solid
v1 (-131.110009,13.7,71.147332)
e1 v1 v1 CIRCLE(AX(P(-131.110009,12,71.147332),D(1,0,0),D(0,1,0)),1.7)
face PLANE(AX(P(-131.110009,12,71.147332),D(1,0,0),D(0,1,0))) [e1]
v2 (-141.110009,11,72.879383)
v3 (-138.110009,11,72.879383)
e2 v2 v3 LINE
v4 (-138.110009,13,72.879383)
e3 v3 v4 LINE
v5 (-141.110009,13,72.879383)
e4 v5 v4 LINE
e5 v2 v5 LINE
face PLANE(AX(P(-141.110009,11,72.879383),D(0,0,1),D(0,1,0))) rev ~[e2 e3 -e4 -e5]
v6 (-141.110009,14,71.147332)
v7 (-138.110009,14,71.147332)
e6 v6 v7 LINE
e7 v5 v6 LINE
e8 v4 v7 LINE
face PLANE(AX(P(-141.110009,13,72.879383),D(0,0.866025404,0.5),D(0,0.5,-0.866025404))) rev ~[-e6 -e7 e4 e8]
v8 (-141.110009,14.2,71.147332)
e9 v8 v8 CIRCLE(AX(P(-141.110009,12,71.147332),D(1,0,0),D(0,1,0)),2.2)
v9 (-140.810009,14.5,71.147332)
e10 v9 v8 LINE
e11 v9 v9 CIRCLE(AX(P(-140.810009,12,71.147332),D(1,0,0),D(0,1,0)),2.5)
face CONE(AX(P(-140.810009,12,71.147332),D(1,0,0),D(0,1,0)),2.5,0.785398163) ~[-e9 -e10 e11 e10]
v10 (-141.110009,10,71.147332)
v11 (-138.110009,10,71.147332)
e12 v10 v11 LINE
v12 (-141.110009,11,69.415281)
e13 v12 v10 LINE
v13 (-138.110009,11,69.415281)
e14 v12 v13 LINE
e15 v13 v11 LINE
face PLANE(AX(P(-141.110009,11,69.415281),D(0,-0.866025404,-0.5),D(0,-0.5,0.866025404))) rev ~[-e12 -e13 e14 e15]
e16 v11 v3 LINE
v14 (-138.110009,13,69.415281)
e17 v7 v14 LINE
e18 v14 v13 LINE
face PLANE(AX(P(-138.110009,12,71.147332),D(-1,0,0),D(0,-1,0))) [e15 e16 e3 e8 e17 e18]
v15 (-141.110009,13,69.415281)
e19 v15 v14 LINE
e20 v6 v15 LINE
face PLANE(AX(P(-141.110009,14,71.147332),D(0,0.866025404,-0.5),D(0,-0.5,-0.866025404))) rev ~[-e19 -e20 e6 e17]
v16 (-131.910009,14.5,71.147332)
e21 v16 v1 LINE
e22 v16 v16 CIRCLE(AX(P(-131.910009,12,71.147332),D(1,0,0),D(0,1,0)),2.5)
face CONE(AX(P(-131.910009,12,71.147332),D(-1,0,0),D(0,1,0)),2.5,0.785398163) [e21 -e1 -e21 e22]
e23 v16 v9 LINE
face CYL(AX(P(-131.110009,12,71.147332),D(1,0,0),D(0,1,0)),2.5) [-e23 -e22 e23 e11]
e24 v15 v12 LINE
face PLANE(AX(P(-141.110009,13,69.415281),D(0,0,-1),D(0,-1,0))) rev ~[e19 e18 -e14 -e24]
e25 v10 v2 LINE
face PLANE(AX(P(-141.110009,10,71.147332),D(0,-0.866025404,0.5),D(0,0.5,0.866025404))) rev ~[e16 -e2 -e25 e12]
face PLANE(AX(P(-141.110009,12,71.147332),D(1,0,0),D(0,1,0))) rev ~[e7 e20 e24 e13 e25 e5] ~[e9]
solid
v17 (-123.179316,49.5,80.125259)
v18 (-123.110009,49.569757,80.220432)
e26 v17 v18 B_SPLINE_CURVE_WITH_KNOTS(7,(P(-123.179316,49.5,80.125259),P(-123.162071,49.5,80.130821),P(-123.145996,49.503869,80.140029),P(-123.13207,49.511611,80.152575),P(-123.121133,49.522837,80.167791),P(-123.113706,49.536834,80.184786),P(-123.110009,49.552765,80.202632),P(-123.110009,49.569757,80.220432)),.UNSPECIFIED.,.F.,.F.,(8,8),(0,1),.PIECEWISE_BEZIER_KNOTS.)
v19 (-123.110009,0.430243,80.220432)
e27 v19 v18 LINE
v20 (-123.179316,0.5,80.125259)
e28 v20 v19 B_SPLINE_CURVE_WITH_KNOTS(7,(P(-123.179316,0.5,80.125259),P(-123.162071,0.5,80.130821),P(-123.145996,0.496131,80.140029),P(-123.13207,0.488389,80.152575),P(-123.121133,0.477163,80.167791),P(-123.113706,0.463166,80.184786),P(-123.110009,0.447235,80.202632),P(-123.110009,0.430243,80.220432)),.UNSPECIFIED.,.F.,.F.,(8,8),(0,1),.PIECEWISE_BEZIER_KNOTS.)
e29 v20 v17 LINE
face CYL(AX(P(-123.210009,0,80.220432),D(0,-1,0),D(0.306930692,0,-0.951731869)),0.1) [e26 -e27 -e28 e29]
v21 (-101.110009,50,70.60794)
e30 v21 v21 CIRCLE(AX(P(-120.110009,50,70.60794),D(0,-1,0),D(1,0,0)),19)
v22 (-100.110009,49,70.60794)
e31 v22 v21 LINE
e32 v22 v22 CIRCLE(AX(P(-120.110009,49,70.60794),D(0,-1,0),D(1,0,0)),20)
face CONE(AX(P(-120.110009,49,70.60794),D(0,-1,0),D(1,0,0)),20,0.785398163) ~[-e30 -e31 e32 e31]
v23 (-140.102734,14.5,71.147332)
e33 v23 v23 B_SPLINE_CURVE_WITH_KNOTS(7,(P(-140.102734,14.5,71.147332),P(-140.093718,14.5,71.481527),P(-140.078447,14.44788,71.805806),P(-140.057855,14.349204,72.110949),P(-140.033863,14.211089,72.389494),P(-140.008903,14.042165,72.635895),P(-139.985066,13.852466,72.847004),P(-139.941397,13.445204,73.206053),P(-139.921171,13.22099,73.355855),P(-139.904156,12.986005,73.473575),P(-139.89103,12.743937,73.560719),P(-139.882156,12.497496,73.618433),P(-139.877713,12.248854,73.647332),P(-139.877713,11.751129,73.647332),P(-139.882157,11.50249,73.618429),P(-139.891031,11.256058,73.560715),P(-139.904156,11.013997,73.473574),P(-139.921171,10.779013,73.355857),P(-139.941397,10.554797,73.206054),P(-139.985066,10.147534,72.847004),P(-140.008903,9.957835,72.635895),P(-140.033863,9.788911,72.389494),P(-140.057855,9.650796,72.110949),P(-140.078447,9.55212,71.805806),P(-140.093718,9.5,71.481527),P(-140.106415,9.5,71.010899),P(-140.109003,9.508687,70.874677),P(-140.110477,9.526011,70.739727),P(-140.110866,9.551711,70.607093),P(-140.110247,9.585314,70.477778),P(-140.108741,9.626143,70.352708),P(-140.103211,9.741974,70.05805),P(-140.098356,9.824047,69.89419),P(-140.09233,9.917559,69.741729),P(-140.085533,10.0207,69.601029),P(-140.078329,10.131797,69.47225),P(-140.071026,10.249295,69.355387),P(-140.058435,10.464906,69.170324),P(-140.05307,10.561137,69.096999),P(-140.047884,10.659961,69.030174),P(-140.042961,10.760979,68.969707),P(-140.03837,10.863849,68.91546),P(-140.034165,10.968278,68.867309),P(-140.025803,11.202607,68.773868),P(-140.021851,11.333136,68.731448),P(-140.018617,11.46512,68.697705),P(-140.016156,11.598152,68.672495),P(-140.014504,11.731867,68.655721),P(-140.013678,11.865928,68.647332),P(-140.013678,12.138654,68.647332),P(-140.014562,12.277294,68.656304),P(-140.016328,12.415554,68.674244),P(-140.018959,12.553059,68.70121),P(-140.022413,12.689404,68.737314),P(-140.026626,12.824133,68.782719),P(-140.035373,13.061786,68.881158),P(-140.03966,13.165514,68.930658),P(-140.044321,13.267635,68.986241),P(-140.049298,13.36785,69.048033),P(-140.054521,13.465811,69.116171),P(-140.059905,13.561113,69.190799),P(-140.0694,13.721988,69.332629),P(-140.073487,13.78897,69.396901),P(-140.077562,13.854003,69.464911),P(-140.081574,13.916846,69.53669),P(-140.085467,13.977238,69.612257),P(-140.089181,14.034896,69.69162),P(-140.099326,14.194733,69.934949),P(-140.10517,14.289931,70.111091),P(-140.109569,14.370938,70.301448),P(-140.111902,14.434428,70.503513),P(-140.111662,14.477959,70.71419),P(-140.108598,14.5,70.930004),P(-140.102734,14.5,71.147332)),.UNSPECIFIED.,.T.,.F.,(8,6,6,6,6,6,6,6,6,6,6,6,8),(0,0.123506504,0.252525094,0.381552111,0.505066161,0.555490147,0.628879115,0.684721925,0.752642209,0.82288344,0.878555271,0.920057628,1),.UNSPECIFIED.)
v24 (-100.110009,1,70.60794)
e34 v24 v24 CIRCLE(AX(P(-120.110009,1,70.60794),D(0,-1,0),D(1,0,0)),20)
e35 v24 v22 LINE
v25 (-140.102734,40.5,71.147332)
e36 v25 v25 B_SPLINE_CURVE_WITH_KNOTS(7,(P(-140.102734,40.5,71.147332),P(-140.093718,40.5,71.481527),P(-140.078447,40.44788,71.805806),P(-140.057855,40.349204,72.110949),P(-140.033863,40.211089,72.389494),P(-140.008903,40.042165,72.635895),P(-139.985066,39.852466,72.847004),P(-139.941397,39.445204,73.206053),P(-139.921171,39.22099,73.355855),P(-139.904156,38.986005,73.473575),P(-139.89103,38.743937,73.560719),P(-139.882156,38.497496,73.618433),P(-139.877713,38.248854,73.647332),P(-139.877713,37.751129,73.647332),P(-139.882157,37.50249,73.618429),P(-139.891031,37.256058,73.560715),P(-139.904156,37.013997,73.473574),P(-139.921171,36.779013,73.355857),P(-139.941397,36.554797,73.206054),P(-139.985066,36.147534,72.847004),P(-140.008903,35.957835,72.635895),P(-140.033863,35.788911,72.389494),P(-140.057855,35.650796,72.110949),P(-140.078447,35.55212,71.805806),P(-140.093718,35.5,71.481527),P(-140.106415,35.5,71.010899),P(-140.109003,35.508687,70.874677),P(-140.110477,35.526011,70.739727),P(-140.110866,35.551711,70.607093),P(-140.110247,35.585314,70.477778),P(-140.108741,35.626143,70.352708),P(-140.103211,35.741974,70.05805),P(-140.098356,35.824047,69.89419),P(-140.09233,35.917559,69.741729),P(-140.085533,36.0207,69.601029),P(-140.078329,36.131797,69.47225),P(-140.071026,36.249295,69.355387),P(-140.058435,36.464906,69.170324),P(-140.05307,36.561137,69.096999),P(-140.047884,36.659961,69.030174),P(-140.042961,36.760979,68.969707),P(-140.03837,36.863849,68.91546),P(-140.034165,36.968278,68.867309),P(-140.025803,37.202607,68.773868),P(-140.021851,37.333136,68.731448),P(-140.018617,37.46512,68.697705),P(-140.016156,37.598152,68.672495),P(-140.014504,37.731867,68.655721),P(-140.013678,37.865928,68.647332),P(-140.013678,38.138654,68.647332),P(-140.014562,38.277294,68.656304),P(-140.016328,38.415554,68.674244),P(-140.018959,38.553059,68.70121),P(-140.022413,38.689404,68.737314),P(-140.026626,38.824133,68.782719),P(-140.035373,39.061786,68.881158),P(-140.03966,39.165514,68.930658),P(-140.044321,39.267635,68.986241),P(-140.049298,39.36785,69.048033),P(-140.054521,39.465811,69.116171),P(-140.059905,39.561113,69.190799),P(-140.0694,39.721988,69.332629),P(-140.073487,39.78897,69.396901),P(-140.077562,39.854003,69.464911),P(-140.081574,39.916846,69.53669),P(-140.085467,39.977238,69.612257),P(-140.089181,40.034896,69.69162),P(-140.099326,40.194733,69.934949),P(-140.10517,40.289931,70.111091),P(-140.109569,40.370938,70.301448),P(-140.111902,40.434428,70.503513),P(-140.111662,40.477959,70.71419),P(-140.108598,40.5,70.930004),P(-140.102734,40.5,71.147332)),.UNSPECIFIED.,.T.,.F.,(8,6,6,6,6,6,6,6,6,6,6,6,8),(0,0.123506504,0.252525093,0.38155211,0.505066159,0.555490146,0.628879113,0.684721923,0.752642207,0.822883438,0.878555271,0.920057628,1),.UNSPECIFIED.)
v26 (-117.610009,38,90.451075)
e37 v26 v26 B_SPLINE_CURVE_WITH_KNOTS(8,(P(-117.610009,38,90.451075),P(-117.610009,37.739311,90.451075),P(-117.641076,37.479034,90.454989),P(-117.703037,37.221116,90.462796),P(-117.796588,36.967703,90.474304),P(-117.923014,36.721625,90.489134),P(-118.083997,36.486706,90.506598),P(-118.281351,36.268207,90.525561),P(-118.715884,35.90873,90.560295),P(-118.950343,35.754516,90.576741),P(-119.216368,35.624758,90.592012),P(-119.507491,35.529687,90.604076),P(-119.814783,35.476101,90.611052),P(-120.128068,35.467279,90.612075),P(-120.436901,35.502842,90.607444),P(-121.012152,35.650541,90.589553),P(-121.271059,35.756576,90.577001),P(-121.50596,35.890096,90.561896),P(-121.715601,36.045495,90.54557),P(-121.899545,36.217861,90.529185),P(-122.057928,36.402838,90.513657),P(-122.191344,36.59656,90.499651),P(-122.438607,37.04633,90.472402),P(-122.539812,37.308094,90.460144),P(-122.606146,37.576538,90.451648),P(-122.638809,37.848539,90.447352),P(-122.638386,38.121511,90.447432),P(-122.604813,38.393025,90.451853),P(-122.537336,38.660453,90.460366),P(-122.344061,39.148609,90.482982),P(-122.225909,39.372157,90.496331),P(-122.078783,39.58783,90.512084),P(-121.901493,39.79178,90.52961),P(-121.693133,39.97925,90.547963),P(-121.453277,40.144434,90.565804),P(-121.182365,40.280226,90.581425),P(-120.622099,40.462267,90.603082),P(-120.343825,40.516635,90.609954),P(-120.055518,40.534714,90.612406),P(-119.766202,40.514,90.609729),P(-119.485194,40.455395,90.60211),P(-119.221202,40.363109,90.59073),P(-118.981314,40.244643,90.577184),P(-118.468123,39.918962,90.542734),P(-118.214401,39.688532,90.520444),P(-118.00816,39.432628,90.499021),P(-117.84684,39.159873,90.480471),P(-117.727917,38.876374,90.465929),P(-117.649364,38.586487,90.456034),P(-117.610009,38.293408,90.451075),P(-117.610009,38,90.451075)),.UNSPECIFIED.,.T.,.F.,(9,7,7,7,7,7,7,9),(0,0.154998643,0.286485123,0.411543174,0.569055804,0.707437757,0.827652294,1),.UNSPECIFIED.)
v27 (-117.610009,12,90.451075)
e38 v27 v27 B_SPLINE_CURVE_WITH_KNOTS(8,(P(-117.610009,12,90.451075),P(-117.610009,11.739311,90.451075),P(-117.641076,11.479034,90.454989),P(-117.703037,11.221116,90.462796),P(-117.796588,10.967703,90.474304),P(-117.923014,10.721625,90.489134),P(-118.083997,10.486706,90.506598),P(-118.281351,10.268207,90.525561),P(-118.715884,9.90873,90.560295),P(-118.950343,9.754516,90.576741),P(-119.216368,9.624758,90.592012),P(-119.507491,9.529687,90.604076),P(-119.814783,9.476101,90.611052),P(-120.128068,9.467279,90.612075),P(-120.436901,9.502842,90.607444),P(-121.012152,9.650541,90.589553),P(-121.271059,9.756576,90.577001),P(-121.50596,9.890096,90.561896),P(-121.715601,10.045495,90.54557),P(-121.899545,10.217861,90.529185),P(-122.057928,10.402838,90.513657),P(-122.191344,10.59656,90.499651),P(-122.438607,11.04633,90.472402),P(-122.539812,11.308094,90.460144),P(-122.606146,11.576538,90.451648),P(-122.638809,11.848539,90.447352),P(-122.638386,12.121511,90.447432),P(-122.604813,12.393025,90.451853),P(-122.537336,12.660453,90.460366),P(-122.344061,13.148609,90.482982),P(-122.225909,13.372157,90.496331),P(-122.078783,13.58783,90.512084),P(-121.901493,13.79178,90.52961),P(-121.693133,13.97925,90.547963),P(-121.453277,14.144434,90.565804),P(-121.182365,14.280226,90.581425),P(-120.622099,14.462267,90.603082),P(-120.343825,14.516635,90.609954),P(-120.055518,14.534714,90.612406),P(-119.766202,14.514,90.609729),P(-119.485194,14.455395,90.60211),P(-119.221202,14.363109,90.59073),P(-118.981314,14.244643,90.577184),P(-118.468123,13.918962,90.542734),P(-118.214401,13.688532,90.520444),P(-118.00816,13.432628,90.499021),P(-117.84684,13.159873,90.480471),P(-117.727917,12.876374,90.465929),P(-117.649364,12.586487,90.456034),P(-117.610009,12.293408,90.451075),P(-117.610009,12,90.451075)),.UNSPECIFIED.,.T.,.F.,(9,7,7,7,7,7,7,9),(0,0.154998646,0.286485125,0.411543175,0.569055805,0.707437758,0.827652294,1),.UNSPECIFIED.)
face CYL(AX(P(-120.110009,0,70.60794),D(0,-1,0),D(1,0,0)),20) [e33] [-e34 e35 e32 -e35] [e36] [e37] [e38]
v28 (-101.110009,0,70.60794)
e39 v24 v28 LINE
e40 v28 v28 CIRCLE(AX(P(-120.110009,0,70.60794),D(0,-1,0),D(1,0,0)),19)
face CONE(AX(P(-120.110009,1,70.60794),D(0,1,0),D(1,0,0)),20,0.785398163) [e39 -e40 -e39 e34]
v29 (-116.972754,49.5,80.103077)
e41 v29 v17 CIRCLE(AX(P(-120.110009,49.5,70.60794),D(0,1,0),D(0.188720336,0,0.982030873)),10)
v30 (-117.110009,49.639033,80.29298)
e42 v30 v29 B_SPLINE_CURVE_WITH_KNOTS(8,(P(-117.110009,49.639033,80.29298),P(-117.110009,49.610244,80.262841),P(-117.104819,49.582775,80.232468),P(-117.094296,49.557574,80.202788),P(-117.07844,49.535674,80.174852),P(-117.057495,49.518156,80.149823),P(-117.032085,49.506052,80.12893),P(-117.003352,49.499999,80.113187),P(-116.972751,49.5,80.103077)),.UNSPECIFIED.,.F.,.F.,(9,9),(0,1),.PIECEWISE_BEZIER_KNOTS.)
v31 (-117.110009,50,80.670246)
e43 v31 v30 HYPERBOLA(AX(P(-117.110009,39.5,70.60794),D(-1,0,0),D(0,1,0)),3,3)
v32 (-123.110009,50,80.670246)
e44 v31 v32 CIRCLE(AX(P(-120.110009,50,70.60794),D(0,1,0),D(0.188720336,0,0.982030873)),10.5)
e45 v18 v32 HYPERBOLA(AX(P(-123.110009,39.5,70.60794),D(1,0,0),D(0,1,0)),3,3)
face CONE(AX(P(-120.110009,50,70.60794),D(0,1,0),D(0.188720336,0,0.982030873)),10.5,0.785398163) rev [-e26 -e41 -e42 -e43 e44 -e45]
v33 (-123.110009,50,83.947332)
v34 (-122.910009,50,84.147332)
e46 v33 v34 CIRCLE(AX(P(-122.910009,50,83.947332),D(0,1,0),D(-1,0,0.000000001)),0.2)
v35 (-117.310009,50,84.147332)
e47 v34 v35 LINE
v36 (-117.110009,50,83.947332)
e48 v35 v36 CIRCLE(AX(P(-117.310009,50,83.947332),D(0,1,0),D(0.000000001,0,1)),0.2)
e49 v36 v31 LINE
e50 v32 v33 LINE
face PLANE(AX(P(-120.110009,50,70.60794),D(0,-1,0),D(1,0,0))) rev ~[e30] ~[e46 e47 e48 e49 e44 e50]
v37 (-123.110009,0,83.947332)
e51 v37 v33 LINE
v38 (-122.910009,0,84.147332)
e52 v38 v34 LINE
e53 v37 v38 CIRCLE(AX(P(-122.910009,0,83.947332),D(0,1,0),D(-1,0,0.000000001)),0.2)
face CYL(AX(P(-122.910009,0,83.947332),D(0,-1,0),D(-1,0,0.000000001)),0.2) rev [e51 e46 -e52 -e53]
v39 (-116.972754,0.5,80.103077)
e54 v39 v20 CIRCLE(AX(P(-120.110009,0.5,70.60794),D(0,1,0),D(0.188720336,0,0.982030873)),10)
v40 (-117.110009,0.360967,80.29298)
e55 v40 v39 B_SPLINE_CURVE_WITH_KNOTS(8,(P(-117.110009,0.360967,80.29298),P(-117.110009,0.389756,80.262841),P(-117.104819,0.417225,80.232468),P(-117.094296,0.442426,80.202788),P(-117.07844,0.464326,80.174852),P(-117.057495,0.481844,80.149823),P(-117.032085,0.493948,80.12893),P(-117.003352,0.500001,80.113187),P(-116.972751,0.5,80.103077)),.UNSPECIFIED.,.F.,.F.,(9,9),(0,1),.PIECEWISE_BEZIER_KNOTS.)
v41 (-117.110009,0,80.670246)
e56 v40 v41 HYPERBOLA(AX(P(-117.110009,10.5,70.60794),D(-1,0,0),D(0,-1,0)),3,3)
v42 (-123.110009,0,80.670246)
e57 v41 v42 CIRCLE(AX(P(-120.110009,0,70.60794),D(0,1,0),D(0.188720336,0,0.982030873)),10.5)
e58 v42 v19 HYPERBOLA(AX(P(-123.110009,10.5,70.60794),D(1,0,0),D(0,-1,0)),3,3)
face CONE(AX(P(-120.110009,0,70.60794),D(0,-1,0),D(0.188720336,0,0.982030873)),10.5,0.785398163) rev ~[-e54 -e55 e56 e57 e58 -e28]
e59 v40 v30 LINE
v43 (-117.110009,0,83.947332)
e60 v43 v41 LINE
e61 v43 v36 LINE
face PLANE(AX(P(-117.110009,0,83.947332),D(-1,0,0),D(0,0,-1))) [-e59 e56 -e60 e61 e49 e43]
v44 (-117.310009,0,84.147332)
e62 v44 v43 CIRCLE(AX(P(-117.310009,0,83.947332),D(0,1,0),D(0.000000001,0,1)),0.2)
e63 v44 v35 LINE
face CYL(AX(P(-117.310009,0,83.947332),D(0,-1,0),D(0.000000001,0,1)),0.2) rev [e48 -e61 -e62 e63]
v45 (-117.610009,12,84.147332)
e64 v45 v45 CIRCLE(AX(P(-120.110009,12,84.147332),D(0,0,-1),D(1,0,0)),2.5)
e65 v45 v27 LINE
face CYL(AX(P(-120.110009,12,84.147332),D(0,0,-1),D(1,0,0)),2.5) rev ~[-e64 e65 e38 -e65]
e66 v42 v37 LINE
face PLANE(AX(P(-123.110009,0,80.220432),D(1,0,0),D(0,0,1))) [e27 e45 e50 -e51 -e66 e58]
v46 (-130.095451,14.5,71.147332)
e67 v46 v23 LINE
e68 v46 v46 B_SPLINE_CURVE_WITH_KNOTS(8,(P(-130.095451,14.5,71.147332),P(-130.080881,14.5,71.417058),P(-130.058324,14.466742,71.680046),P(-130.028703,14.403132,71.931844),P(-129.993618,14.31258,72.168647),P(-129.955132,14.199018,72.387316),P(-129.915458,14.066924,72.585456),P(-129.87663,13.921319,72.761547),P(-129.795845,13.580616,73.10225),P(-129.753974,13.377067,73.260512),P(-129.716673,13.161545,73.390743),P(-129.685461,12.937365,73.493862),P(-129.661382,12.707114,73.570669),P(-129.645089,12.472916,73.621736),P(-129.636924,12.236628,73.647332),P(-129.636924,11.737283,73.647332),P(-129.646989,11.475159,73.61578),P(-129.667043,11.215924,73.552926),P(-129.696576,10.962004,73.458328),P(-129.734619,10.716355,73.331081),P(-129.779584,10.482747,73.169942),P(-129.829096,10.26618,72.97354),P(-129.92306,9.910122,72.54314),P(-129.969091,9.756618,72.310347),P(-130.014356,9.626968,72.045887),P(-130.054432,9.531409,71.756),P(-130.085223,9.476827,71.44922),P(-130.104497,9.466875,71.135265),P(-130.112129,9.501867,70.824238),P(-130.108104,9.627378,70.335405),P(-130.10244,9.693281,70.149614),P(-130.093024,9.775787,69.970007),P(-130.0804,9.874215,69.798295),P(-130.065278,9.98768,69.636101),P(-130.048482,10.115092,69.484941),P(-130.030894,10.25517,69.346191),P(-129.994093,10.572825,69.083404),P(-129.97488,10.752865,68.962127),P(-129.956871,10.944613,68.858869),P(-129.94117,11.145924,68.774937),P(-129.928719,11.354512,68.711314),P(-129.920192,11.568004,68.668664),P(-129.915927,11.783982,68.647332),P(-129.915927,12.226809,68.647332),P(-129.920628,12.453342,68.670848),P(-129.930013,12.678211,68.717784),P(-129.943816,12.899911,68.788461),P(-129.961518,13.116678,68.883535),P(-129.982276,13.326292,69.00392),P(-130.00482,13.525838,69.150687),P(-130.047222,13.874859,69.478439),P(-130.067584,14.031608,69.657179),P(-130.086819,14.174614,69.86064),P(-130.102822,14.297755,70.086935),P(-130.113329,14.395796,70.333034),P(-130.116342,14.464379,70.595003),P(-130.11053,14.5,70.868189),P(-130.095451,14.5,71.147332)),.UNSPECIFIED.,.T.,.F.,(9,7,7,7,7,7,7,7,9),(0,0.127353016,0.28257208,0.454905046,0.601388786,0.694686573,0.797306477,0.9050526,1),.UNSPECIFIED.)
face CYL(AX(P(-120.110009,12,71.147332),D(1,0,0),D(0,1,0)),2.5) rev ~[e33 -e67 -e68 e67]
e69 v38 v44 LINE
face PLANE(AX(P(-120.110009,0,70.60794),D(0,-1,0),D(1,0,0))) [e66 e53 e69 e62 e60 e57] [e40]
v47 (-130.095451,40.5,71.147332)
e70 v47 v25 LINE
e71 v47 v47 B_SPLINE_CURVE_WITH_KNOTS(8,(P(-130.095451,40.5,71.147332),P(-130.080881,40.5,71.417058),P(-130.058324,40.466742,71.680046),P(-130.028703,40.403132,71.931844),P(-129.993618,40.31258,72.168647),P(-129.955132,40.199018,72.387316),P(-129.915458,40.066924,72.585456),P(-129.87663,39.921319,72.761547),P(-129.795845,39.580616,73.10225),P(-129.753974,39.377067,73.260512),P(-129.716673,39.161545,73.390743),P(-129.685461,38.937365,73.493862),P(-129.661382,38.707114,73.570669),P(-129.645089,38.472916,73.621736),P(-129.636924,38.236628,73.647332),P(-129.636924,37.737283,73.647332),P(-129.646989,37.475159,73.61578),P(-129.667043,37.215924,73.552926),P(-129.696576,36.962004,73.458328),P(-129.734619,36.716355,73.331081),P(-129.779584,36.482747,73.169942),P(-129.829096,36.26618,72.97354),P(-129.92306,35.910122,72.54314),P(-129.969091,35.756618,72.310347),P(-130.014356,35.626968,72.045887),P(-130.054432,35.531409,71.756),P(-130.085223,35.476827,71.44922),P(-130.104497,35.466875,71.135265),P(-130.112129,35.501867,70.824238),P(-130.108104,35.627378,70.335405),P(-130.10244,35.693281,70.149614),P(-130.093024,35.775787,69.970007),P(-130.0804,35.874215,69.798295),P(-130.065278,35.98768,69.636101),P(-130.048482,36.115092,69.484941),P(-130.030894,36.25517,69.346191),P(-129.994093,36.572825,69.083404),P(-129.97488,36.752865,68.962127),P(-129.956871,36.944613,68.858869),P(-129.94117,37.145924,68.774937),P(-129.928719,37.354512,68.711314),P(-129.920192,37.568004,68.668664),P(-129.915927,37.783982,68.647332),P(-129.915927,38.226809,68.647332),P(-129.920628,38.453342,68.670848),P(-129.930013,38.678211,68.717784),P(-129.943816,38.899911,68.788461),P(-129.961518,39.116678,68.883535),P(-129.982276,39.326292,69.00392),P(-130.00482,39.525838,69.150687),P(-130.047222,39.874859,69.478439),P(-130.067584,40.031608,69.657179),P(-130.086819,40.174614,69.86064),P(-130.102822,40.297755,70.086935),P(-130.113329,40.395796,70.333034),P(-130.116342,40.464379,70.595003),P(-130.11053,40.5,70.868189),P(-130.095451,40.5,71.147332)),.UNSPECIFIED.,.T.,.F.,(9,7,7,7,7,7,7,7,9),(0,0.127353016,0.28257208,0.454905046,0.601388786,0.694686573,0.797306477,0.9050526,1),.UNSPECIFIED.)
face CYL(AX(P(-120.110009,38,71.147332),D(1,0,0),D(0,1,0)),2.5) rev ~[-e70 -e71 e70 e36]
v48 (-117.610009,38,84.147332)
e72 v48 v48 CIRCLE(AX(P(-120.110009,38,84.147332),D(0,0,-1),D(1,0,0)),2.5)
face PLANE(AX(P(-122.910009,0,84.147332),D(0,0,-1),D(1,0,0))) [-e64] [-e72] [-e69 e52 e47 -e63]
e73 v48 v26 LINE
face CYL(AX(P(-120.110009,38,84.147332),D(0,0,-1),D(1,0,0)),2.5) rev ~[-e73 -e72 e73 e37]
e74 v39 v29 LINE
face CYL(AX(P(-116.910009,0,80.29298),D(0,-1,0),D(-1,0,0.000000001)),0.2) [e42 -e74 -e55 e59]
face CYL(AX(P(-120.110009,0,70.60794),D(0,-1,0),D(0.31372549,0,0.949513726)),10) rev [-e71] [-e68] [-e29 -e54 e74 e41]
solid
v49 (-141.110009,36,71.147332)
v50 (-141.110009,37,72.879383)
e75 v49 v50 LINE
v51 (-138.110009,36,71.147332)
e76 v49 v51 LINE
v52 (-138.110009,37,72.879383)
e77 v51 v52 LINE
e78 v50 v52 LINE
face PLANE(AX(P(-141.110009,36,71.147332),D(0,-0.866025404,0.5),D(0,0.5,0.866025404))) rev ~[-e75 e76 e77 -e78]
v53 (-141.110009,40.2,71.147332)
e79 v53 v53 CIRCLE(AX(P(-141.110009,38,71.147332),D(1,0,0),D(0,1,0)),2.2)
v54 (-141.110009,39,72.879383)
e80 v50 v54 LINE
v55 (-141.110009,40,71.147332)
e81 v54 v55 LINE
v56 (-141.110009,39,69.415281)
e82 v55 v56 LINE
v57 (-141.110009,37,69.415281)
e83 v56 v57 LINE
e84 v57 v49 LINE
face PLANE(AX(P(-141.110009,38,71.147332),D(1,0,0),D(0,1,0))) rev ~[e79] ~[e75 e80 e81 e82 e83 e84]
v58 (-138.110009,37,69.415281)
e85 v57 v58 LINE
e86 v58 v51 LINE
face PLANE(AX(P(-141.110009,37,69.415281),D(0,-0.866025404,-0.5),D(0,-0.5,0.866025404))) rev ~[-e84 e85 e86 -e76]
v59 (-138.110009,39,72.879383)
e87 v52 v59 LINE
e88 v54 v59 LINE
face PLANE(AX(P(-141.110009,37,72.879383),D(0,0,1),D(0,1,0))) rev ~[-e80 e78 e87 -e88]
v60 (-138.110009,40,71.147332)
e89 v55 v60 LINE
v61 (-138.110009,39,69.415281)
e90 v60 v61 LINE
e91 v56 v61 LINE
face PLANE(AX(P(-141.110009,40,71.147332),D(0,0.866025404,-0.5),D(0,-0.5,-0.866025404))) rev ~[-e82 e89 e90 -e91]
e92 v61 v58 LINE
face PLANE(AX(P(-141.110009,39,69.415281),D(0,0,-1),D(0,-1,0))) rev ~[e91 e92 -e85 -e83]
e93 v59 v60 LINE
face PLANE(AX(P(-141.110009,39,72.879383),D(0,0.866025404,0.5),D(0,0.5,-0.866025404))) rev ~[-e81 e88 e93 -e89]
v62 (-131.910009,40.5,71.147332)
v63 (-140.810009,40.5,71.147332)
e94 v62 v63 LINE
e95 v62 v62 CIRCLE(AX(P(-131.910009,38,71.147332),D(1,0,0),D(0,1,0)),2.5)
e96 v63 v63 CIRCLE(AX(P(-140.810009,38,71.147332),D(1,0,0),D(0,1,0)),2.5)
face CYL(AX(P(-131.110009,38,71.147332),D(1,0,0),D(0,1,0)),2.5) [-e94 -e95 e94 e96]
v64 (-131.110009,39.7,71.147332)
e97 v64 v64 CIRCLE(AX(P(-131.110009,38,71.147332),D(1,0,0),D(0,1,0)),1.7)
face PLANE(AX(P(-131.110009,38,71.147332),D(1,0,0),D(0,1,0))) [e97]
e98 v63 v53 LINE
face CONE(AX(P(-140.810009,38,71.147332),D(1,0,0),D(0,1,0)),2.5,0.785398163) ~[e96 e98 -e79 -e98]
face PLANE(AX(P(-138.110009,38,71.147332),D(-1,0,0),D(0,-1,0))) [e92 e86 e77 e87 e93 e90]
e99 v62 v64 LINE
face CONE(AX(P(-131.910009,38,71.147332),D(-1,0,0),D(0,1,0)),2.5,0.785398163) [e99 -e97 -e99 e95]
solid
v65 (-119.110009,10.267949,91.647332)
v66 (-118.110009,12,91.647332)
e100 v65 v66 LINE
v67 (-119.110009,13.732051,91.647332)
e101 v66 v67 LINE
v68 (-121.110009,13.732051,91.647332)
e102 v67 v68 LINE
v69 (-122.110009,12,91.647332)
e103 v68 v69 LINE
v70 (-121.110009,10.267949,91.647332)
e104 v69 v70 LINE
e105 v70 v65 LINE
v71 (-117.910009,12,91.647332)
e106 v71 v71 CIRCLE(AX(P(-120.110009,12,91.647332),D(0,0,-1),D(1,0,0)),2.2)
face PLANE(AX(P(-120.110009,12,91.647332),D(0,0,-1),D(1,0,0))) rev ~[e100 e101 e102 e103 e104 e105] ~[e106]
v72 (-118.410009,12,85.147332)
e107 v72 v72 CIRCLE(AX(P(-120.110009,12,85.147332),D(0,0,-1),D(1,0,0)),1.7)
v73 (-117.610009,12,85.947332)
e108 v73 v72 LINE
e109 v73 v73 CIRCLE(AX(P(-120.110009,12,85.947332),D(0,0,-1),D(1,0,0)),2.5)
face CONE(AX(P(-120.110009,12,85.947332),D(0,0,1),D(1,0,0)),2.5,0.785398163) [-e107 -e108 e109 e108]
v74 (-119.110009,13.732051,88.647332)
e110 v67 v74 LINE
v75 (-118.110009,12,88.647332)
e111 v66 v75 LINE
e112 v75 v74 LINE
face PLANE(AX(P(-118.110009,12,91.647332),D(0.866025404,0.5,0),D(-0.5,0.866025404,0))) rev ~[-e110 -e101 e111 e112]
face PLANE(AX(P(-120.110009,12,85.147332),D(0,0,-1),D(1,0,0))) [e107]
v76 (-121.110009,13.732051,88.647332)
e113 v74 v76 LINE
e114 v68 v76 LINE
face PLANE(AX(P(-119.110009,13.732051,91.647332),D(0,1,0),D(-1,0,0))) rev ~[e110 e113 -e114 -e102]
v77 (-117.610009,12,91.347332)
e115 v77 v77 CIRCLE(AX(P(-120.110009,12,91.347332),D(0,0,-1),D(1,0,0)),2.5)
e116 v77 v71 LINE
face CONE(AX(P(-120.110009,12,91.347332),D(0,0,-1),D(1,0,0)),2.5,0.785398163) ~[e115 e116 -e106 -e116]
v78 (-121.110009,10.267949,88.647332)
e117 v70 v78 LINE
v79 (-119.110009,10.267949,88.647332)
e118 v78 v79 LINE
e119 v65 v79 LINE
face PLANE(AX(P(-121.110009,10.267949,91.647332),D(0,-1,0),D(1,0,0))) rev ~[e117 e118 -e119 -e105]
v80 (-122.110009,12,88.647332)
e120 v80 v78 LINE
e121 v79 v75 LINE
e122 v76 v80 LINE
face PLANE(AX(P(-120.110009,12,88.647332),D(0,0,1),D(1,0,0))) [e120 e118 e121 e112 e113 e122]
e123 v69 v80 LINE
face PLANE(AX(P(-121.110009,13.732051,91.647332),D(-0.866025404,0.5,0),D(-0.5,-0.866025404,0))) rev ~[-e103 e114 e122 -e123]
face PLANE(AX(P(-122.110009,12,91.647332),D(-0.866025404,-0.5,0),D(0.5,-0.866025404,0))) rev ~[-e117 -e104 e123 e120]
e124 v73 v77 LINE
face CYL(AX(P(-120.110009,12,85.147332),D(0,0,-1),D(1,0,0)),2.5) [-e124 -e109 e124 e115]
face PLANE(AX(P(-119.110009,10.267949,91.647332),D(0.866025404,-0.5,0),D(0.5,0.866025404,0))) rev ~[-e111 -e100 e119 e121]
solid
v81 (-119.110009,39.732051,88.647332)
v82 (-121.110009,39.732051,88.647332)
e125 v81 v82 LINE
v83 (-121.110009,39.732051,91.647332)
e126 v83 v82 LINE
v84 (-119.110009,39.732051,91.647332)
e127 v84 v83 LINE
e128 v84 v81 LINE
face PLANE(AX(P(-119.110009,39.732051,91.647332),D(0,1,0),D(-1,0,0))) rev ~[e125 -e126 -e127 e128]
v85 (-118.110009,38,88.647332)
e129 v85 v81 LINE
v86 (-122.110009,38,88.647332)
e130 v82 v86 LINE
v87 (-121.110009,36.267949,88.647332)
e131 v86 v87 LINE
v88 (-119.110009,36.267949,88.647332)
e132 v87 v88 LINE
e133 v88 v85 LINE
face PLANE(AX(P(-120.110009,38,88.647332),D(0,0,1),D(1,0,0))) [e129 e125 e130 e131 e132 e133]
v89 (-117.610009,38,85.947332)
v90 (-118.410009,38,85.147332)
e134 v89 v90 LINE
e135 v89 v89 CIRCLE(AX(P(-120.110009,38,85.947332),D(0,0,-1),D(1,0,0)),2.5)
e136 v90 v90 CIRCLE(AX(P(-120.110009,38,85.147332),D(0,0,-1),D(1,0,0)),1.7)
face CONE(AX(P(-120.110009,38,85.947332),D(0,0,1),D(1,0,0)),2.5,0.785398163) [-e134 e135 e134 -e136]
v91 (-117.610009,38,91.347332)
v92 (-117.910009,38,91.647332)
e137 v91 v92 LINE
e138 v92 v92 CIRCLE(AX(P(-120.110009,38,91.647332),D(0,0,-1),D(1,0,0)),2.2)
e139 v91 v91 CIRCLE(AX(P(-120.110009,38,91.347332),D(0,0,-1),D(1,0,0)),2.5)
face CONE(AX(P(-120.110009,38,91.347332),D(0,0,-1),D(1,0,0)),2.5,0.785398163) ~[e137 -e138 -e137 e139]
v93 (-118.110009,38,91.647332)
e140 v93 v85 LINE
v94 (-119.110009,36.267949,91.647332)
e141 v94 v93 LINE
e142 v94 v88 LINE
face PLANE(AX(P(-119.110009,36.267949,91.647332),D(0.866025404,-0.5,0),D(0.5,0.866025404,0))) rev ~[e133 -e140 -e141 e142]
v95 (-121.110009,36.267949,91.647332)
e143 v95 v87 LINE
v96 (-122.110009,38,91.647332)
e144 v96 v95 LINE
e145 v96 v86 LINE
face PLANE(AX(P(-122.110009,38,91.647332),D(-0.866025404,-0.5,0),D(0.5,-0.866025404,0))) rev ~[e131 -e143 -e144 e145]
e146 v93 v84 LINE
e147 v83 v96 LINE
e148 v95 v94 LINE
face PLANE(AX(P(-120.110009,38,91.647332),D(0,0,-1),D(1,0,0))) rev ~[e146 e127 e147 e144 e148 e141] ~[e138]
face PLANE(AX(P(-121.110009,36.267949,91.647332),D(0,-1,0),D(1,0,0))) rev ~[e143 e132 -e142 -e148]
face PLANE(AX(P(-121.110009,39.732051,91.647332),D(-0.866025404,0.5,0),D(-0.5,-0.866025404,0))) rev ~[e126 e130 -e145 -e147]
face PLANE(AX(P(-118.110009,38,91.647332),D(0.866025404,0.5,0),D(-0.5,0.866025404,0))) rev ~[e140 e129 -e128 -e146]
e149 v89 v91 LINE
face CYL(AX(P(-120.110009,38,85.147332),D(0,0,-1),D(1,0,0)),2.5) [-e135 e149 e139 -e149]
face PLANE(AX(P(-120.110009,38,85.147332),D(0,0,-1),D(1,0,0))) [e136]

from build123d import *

# Parameters (mm, degrees)
F0_R         = 20
F1_DEPTH     = 50
F2_SIZE      = 1
F3_R         = 2.5
F4_DEPTH     = 6.4616079858
F6_R         = 2.5
F7_DEPTH     = 20.0010001
F8_START     = -11
F8_DEPTH     = 10
F9_START     = -1
F9_DEPTH     = 6.5
F10_SIZE     = 0.8
F10_2_SIZE   = 0.8
F10_3_SIZE   = 0.8
F10_4_SIZE   = 0.8
F12_DEPTH    = 3
F13_SIZE     = 0.3
F13_2_SIZE   = 0.3
F13_3_SIZE   = 0.3
F13_4_SIZE   = 0.3
F15_DEPTH    = 3
F16_T2_ANGLE = 338.6533053812
F16_T4_ANGLE = 338.6533053812


# Not quite as in the source:
# - a fillet or chamfer that OpenCascade refuses, or shapes differently, is made with other operations: its cross-section is extruded or revolved along the edge and cut away or added
# - a feature names something its author has since deleted; it is built from what else it names


with BuildPart() as f1:
    # F0 (on Front) → F1 (new body)
    with BuildSketch(Plane.XZ):
        with Locations((-120.1100092272, 70.6079402205)):
            Circle(F0_R)
        with BuildLine():
            ThreePointArc((-123.1100092272, 83.9473322347), (-123.0514305834, 84.0887535909), (-122.9100092272, 84.1473322347))
            Line((-122.9100092272, 84.1473322347), (-117.3100092272, 84.1473322347))
            ThreePointArc((-117.3100092272, 84.1473322347), (-117.168587871, 84.0887535909), (-117.1100092272, 83.9473322347))
            Line((-117.1100092272, 83.9473322347), (-117.1100092272, 80.2929802308))
            ThreePointArc((-117.1100092272, 80.2929802308), (-117.0721033659, 80.1758243935), (-116.9727543252, 80.1030774855))
            ThreePointArc((-116.9727543252, 80.1030774855), (-120.1457476597, 60.6080040825), (-123.1793161579, 80.1252589062))
            ThreePointArc((-123.1793161579, 80.1252589062), (-123.1291720237, 80.161564899), (-123.1100092272, 80.2204320931))
            Line((-123.1100092272, 80.2204320931), (-123.1100092272, 83.9473322347))
        make_face(mode=Mode.SUBTRACT)
    extrude(amount=-F1_DEPTH)

    # F2
    f2_edges = [f1.edges().sort_by_distance(p)[0] for p in [
        (-140.110009, 0, 70.60794),
        (-140.110009, 50, 70.60794),
    ]]
    chamfer(f2_edges, length=F2_SIZE)

    # F3 (on face) → F4 (cut, through all)
    with BuildSketch(Plane(origin=(0, 0, 84.1473322347), x_dir=(1, 0, 0), z_dir=(0, 0, -1))):
        with Locations((-120.1100092272, -12)):
            Circle(F3_R)
        with Locations((-120.1100092272, -38)):
            Circle(F3_R)
    extrude(amount=-F4_DEPTH, mode=Mode.SUBTRACT)

    # F6 (on offset) → F7 (cut, through all)
    with BuildSketch(Plane.YZ.offset(-120.1100092272)):
        with Locations((12, 71.1473322347)):
            Circle(F6_R)
        with Locations((38, 71.1473322347)):
            Circle(F6_R)
    extrude(amount=-F7_DEPTH, mode=Mode.SUBTRACT)

    # F16: chamfer of 0.5 on 2 edges, made by hand

    # F16_s1 → F16_t2 (revolve, cut)
    with BuildSketch(Plane(origin=(-128.9179601882, 0, 24.7746190281), x_dir=(0, 1, 0), z_dir=(-0.9820308726, 0, 0.1887203358))):
        Polygon((0, -57.1719758706), (0.5, -56.6719758706), (0, -56.6719758706), align=None)
    revolve(axis=Axis((-120.1100092272, 0, 70.6079402205), (0, 1, 0)), revolution_arc=F16_T2_ANGLE, mode=Mode.SUBTRACT)

    # F16_s3 → F16_t4 (revolve, cut)
    with BuildSketch(Plane(origin=(-128.9179601882, 0, 24.7746190281), x_dir=(0, 1, 0), z_dir=(-0.9820308726, 0, 0.1887203358))):
        Polygon((50, -57.1719758706), (49.5, -56.6719758706), (50, -56.6719758706), align=None)
    revolve(axis=Axis((-120.1100092272, 50, 70.6079402205), (0, 1, 0)), revolution_arc=F16_T4_ANGLE, mode=Mode.SUBTRACT)


with BuildPart() as f8:
    # F6 (on offset) → F8 (new body)
    with BuildSketch(Plane.YZ.offset(-120.1100092272).offset(F8_START)):
        with Locations((38, 71.1473322347)):
            Circle(F6_R)
    extrude(amount=-F8_DEPTH)

    # F10
    f10_edges = [f8.edges().sort_by_distance(p)[0] for p in [
        (-131.110009, 35.5, 71.147332),
    ]]
    chamfer(f10_edges, length=F10_SIZE)

    # F13
    f13_edges = [f8.edges().sort_by_distance(p)[0] for p in [
        (-141.110009, 35.5, 71.147332),
    ]]
    chamfer(f13_edges, length=F13_SIZE)


with BuildPart() as f8b:
    # F6 (on offset) → F8, piece 2 (new body)
    with BuildSketch(Plane.YZ.offset(-120.1100092272).offset(F8_START)):
        with Locations((12, 71.1473322347)):
            Circle(F6_R)
    extrude(amount=-F8_DEPTH)

    # F10#2
    f10_2_edges = [f8b.edges().sort_by_distance(p)[0] for p in [
        (-131.110009, 9.5, 71.147332),
    ]]
    chamfer(f10_2_edges, length=F10_2_SIZE)

    # F13#2
    f13_2_edges = [f8b.edges().sort_by_distance(p)[0] for p in [
        (-141.110009, 9.5, 71.147332),
    ]]
    chamfer(f13_2_edges, length=F13_2_SIZE)


with BuildPart() as f9:
    # F3 (on face) → F9 (new body)
    with BuildSketch(Plane(origin=(0, 0, 84.1473322347), x_dir=(1, 0, 0), z_dir=(0, 0, -1)).offset(F9_START)):
        with Locations((-120.1100092272, -38)):
            Circle(F3_R)
    extrude(amount=-F9_DEPTH)

    # F10#3
    f10_3_edges = [f9.edges().sort_by_distance(p)[0] for p in [
        (-122.610009, 38, 85.147332),
    ]]
    chamfer(f10_3_edges, length=F10_3_SIZE)


with BuildPart() as f9b:
    # F3 (on face) → F9, piece 2 (new body)
    with BuildSketch(Plane(origin=(0, 0, 84.1473322347), x_dir=(1, 0, 0), z_dir=(0, 0, -1)).offset(F9_START)):
        with Locations((-120.1100092272, -12)):
            Circle(F3_R)
    extrude(amount=-F9_DEPTH)

    # F10#4
    f10_4_edges = [f9b.edges().sort_by_distance(p)[0] for p in [
        (-122.610009, 12, 85.147332),
    ]]
    chamfer(f10_4_edges, length=F10_4_SIZE)


with BuildPart() as f12_tool:
    # F11 (on face) → F12 (new body)
    with BuildSketch(Plane.XY.offset(91.6473322347)):
        Polygon((-121.1100092272, 36.2679491924), (-119.1100092272, 36.2679491924), (-118.1100092272, 38), (-119.1100092272, 39.7320508076), (-121.1100092272, 39.7320508076), (-122.1100092272, 38), align=None)
        Polygon((-121.1100092272, 10.2679491924), (-119.1100092272, 10.2679491924), (-118.1100092272, 12), (-119.1100092272, 13.7320508076), (-121.1100092272, 13.7320508076), (-122.1100092272, 12), align=None)
    extrude(amount=-F12_DEPTH)


with BuildPart() as f9_1:
    add(f9.part)

    # F12: cut by f12_tool
    add(f12_tool.part, mode=Mode.SUBTRACT)

    # F13#3
    f13_3_edges = [f9_1.edges().sort_by_distance(p)[0] for p in [
        (-122.610009, 38, 91.647332),
    ]]
    chamfer(f13_3_edges, length=F13_3_SIZE)


with BuildPart() as f9b_1:
    add(f9b.part)

    # F12: cut by f12_tool
    add(f12_tool.part, mode=Mode.SUBTRACT)

    # F13#4
    f13_4_edges = [f9b_1.edges().sort_by_distance(p)[0] for p in [
        (-122.610009, 12, 91.647332),
    ]]
    chamfer(f13_4_edges, length=F13_4_SIZE)


with BuildPart() as f15_tool:
    # F14 (on face) → F15 (new body)
    with BuildSketch(Plane(origin=(-141.1100092272, 0, 0), x_dir=(0, -1, 0), z_dir=(-1, 0, 0))):
        Polygon((-39, 69.4152814271), (-37, 69.4152814271), (-36, 71.1473322347), (-37, 72.8793830423), (-39, 72.8793830423), (-40, 71.1473322347), align=None)
        Polygon((-13, 69.4152814271), (-11, 69.4152814271), (-10, 71.1473322347), (-11, 72.8793830423), (-13, 72.8793830423), (-14, 71.1473322347), align=None)
    extrude(amount=-F15_DEPTH)


with BuildPart() as f8_1:
    add(f8.part)

    # F15: cut by f15_tool
    add(f15_tool.part, mode=Mode.SUBTRACT)


with BuildPart() as f8b_1:
    add(f8b.part)

    # F15: cut by f15_tool
    add(f15_tool.part, mode=Mode.SUBTRACT)


solid = Compound([f1.part, f9_1.part, f9b_1.part, f8_1.part, f8b_1.part])
